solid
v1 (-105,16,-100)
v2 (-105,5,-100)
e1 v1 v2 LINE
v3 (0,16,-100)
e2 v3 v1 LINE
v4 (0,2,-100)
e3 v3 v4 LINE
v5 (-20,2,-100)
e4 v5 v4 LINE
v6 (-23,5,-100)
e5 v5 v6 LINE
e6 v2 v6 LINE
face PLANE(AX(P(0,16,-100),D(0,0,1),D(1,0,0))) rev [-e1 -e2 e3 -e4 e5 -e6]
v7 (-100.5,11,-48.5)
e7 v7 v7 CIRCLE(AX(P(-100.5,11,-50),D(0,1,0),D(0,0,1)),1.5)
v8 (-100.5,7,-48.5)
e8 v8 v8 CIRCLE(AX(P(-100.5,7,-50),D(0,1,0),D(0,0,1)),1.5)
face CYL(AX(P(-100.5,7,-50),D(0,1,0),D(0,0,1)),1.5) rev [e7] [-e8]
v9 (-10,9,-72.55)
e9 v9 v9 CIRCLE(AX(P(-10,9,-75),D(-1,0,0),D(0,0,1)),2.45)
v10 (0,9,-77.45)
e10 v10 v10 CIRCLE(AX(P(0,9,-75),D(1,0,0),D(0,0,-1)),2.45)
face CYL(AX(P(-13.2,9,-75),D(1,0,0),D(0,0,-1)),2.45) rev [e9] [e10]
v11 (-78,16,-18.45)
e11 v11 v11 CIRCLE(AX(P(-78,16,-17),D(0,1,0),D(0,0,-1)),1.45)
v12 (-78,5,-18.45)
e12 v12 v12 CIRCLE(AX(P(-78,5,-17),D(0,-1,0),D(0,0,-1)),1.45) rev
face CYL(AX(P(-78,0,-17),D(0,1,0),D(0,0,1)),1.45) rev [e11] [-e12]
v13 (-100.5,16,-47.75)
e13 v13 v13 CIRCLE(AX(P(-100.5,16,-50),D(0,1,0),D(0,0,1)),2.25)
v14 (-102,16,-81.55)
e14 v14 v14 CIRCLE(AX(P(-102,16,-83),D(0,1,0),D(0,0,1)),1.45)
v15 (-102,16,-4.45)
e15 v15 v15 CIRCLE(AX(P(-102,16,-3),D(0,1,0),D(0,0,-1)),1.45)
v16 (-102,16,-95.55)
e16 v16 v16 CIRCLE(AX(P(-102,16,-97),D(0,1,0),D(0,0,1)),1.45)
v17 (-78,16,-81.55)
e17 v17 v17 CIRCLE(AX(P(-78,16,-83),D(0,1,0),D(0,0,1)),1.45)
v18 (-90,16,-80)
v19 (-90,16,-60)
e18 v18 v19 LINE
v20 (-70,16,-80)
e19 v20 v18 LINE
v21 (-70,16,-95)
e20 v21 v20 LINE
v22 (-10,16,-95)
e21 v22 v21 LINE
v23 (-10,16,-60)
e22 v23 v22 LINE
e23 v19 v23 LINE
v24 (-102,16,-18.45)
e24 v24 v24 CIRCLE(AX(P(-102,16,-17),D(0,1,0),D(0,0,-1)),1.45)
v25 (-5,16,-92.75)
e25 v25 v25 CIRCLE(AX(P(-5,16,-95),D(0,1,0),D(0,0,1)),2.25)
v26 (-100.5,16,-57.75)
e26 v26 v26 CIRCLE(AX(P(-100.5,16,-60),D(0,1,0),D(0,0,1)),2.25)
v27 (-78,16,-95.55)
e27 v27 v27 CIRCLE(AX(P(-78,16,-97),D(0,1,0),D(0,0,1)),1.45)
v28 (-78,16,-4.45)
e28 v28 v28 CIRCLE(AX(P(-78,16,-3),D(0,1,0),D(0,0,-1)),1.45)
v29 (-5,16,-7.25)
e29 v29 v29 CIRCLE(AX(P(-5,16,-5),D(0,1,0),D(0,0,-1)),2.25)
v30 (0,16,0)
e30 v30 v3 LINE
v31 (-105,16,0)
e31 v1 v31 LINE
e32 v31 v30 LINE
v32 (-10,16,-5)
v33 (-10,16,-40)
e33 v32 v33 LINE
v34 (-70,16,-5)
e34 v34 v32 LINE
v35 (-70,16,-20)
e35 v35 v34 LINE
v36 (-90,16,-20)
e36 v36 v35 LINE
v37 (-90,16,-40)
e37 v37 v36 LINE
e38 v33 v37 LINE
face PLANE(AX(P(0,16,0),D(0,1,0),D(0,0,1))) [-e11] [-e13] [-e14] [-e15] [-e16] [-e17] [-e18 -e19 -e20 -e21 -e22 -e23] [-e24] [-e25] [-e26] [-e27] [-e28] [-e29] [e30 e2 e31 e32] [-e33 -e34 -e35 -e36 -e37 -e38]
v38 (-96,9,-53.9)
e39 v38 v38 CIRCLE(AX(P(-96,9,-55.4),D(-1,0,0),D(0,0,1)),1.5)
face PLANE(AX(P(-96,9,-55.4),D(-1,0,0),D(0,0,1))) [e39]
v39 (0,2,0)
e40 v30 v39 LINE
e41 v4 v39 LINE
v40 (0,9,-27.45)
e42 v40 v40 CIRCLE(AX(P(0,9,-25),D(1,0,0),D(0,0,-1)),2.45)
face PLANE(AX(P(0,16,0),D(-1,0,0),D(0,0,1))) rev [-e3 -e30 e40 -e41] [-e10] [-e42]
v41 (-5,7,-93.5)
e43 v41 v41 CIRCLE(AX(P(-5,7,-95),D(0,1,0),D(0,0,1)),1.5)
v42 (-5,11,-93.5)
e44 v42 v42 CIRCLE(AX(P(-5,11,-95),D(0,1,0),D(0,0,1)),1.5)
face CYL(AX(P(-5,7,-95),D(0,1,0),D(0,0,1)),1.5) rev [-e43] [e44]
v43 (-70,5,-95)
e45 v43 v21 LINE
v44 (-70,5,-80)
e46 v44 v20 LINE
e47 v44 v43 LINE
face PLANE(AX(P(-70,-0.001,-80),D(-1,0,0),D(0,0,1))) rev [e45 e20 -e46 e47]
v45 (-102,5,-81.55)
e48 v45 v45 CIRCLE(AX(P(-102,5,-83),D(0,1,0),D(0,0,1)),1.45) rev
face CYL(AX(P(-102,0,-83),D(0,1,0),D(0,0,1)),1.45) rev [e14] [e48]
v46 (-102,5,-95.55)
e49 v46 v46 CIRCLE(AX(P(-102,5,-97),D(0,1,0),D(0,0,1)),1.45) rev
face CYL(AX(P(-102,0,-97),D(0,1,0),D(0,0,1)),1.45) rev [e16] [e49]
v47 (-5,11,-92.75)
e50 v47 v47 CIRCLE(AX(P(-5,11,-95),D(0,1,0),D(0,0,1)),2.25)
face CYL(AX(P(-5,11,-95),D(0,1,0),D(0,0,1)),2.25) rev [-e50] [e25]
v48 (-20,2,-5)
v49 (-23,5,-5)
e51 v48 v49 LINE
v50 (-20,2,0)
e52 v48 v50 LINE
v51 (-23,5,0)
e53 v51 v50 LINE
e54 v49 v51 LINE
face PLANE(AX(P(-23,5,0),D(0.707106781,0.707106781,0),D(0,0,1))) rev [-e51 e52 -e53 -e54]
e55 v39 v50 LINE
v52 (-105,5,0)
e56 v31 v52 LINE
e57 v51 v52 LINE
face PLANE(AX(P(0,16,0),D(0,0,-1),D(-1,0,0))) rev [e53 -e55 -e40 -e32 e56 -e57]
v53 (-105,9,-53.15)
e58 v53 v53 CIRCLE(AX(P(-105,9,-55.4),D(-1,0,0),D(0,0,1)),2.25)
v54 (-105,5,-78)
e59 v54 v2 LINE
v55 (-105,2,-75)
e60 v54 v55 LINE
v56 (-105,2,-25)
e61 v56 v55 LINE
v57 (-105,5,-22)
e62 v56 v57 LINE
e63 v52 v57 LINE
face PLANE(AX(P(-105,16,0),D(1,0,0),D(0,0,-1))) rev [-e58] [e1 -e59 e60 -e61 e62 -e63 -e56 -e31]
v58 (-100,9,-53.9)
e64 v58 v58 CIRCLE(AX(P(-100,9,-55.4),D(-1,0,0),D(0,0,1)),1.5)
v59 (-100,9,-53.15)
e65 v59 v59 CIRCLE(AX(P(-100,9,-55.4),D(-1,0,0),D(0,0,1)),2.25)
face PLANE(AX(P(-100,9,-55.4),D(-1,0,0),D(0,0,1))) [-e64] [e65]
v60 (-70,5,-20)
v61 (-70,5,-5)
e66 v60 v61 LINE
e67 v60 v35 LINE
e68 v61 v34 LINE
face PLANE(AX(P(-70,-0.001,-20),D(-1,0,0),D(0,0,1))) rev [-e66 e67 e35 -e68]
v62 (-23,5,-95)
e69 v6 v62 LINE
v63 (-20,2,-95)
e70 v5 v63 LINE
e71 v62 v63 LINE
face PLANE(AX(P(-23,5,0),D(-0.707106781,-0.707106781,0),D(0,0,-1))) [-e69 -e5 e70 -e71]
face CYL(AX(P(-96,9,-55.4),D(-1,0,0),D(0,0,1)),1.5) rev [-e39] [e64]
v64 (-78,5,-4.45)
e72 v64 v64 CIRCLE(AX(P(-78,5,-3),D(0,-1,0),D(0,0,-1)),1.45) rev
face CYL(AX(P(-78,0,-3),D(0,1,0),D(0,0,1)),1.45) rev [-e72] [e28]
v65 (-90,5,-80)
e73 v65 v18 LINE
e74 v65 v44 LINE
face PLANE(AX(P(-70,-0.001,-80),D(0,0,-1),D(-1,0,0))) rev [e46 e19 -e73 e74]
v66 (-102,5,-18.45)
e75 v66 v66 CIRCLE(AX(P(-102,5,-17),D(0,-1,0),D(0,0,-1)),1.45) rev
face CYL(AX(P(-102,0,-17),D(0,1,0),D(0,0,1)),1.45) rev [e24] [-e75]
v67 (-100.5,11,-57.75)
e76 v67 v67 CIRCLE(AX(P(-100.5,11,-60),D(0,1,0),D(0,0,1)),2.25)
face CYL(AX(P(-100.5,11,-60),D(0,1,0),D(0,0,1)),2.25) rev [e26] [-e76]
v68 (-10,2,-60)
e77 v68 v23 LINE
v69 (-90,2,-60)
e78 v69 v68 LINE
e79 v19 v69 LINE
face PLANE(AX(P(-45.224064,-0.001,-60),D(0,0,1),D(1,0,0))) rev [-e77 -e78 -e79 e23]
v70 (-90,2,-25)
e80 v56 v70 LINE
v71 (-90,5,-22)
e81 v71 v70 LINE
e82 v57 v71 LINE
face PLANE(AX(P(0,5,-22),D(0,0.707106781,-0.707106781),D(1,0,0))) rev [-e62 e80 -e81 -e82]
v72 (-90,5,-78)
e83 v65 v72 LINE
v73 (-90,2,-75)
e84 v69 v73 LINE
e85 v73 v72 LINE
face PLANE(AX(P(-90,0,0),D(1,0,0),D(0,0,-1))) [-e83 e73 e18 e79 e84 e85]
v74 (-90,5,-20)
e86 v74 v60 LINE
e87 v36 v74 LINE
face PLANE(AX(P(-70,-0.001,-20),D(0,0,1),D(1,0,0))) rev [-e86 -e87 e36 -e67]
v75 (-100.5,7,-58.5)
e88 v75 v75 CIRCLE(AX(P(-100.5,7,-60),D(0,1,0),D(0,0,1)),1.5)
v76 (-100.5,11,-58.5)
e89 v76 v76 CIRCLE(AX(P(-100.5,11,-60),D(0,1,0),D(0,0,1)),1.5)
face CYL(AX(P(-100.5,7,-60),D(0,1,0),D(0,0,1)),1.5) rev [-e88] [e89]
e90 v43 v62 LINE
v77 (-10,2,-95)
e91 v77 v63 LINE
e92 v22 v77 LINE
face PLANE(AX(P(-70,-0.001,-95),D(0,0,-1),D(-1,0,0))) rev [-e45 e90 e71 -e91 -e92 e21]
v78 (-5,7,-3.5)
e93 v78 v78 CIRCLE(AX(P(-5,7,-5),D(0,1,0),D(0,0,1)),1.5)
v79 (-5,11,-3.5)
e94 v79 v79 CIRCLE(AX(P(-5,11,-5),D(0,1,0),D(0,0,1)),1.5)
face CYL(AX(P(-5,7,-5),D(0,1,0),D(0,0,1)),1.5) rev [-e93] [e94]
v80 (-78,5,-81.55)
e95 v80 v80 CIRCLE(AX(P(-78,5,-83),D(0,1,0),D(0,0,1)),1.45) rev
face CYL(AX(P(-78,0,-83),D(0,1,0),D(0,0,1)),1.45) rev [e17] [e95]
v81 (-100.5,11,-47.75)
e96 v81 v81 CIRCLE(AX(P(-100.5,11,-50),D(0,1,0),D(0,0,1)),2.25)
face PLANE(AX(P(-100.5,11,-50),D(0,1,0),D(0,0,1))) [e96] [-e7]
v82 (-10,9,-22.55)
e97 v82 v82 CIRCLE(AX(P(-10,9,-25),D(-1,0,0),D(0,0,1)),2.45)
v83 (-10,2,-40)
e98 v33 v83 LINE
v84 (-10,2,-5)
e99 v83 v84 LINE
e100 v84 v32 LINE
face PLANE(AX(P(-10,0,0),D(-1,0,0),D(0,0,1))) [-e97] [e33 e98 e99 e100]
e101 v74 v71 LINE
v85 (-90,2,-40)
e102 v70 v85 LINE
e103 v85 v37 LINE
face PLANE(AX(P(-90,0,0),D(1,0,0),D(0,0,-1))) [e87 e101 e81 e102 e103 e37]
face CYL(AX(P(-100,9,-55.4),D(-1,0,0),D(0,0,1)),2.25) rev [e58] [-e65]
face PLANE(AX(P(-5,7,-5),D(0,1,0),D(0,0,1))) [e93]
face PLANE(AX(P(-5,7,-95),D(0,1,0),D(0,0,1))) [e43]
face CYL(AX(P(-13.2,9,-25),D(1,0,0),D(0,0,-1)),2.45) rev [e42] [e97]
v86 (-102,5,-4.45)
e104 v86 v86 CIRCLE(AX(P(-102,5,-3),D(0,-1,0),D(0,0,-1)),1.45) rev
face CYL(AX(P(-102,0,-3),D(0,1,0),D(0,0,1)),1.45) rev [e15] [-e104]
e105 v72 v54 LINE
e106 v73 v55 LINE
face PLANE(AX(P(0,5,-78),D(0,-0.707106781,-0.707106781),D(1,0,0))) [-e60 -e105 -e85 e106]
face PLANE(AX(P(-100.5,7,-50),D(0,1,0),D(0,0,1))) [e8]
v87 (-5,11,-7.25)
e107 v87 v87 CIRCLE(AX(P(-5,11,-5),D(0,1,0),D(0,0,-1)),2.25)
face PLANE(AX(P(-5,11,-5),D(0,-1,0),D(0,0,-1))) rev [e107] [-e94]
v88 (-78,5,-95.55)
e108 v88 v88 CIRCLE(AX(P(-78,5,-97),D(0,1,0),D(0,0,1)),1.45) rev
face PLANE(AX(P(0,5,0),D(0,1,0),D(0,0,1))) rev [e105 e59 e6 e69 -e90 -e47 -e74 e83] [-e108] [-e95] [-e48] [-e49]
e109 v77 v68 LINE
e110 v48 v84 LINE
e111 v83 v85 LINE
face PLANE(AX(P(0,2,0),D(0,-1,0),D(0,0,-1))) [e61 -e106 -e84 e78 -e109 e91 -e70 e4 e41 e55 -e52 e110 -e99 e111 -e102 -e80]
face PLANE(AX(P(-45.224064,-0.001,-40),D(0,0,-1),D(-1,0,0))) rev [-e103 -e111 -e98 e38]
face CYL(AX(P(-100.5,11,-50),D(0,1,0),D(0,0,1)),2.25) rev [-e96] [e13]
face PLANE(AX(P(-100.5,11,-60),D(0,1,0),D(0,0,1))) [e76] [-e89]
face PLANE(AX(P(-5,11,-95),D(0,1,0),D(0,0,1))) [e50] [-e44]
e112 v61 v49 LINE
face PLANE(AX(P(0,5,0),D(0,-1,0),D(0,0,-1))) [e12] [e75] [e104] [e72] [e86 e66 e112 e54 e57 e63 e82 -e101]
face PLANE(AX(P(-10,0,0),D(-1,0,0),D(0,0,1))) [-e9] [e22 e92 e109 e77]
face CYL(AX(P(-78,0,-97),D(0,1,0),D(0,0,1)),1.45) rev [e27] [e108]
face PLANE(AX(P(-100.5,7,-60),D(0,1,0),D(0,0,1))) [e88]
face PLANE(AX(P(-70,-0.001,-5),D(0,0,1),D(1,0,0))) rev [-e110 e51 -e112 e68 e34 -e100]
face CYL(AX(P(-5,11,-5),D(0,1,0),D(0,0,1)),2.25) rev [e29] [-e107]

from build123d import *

# Parameters (mm, degrees)
SKETCH_1_W           = 105
SKETCH_1_H           = 100
EXTRUDE_1_DEPTH      = 16
CUT_EXTRUDE_5_REACH  = 147.88
SKETCH_8_R           = 1.45
CUT_EXTRUDE_7_DEPTH  = 146.880087743
SKETCH_9_W           = 35
SKETCH_9_H           = 16
EXTRUDE_2_DEPTH      = 5
SKETCH_10_R          = 2.25
CUT_EXTRUDE_8_DEPTH  = 5
SKETCH_12_W          = 20
SKETCH_12_H          = 16
EXTRUDE_3_DEPTH      = 10
SKETCH_13_R          = 2.25
CUT_EXTRUDE_10_DEPTH = 5
SKETCH_14_W          = 105
SKETCH_14_H          = 100
CUT_EXTRUDE_11_DEPTH = 2
SKETCH_15_R          = 1.5
CUT_EXTRUDE_12_DEPTH = 4
SKETCH_16_W          = 85
SKETCH_16_H          = 25
CUT_EXTRUDE_13_DEPTH = 3
CHAMFER_1_SIZE       = 3
SKETCH_17_R          = 2.25
CUT_EXTRUDE_14_DEPTH = 5
SKETCH_18_R          = 1.5
CUT_EXTRUDE_15_DEPTH = 4
SKETCH_21_R          = 2.45
CUT_EXTRUDE_17_DEPTH = 13.2


with BuildPart() as part:
    # 草图1 → 凸台-拉伸1 (new body)
    with BuildSketch(Plane(origin=(0, 0, 0), x_dir=(1, 0, 0), z_dir=(0, 1, 0))):
        with Locations((-52.5, 50)):
            Rectangle(SKETCH_1_W, SKETCH_1_H)
    extrude(amount=EXTRUDE_1_DEPTH)

    # 草图6 → 切除-拉伸5 (cut, up to next)
    with BuildSketch(Plane(origin=(0, 16, 0), x_dir=(1, 0, 0), z_dir=(0, 1, 0)), mode=Mode.PRIVATE) as cut_extrude_5_sk1:
        Polygon((-45.224064051, 40), (-5, 40), (-5, 5), (-70, 5), (-70, 20), (-100, 20), (-100, 40), align=None)
    cut_extrude_5_tool1 = extrude(cut_extrude_5_sk1.sketch, amount=-CUT_EXTRUDE_5_REACH, mode=Mode.PRIVATE) & part.part
    # 草图6 → 切除-拉伸5 (cut, up to next)
    with BuildSketch(Plane(origin=(0, 16, 0), x_dir=(1, 0, 0), z_dir=(0, 1, 0)), mode=Mode.PRIVATE) as cut_extrude_5_sk2:
        Polygon((-70, 95), (-5, 95), (-5, 60), (-45.224064051, 60), (-100, 60), (-100, 80), (-70, 80), align=None)
    cut_extrude_5_tool2 = extrude(cut_extrude_5_sk2.sketch, amount=-CUT_EXTRUDE_5_REACH, mode=Mode.PRIVATE) & part.part
    add(cut_extrude_5_tool1.solids().sort_by_distance((-47.413043, 16, -24.065217))[0], mode=Mode.SUBTRACT)
    add(cut_extrude_5_tool2.solids().sort_by_distance((-47.413043, 16, -75.934783))[0], mode=Mode.SUBTRACT)

    # 草图8 → 切除-拉伸7 (cut, through all)
    with BuildSketch(Plane(origin=(0, 16, 0), x_dir=(1, 0, 0), z_dir=(0, 1, 0))):
        with Locations(Location((-102, 97, 0), (0, 0, 270))):
            Circle(SKETCH_8_R)
        with Locations(Location((-102, 83, 0), (0, 0, 270))):
            Circle(SKETCH_8_R)
        with Locations(Location((-78, 97, 0), (0, 0, 270))):
            Circle(SKETCH_8_R)
        with Locations(Location((-78, 83, 0), (0, 0, 270))):
            Circle(SKETCH_8_R)
        with Locations(Location((-78, 17, 0), (0, 0, 90))):
            Circle(SKETCH_8_R)
        with Locations(Location((-78, 3, 0), (0, 0, 90))):
            Circle(SKETCH_8_R)
        with Locations(Location((-102, 17, 0), (0, 0, 90))):
            Circle(SKETCH_8_R)
        with Locations(Location((-102, 3, 0), (0, 0, 90))):
            Circle(SKETCH_8_R)
    extrude(amount=-CUT_EXTRUDE_7_DEPTH, mode=Mode.SUBTRACT)

    # 草图9 → 凸台-拉伸2 (add)
    with BuildSketch(Plane.ZY.offset(5)):
        with Locations((-22.5, 8)):
            Rectangle(SKETCH_9_W, SKETCH_9_H)
        with Locations((-77.5, 8)):
            Rectangle(SKETCH_9_W, SKETCH_9_H)
    extrude(amount=EXTRUDE_2_DEPTH)

    # 草图10 → 切除-拉伸8 (cut)
    with BuildSketch(Plane(origin=(0, 16, 0), x_dir=(1, 0, 0), z_dir=(0, 1, 0))):
        with Locations(Location((-5, 95, 0), (0, 0, 270))):
            Circle(SKETCH_10_R)
        with Locations(Location((-5, 5, 0), (0, 0, 90))):
            Circle(SKETCH_10_R)
    extrude(amount=-CUT_EXTRUDE_8_DEPTH, mode=Mode.SUBTRACT)

    # 草图12 → 凸台-拉伸3 (add)
    with BuildSketch(Plane(origin=(-100, 0, 0), x_dir=(0, 0, -1), z_dir=(1, 0, 0))):
        with Locations((30, 8)):
            Rectangle(SKETCH_12_W, SKETCH_12_H)
        with Locations((70, 8)):
            Rectangle(SKETCH_12_W, SKETCH_12_H)
    extrude(amount=EXTRUDE_3_DEPTH)

    # 草图13 → 切除-拉伸10 (cut)
    with BuildSketch(Plane(origin=(0, 16, 0), x_dir=(1, 0, 0), z_dir=(0, 1, 0))):
        with Locations(Location((-100.5, 50, 0), (0, 0, 270))):
            Circle(SKETCH_13_R)
        with Locations(Location((-100.5, 60, 0), (0, 0, 270))):
            Circle(SKETCH_13_R)
    extrude(amount=-CUT_EXTRUDE_10_DEPTH, mode=Mode.SUBTRACT)

    # 草图14 → 切除-拉伸11 (cut)
    with BuildSketch(Plane.XZ):
        with Locations((-52.5, -50)):
            Rectangle(SKETCH_14_W, SKETCH_14_H)
    extrude(amount=-CUT_EXTRUDE_11_DEPTH, mode=Mode.SUBTRACT)

    # 草图15 → 切除-拉伸12 (cut)
    with BuildSketch(Plane(origin=(0, 11, 0), x_dir=(1, 0, 0), z_dir=(0, 1, 0))):
        with Locations(Location((-5, 5, 0), (0, 0, 270))):
            Circle(SKETCH_15_R)
        with Locations(Location((-5, 95, 0), (0, 0, 270))):
            Circle(SKETCH_15_R)
        with Locations(Location((-100.5, 60, 0), (0, 0, 270))):
            Circle(SKETCH_15_R)
        with Locations(Location((-100.5, 50, 0), (0, 0, 270))):
            Circle(SKETCH_15_R)
    extrude(amount=-CUT_EXTRUDE_12_DEPTH, mode=Mode.SUBTRACT)

    # 草图16 → 切除-拉伸13 (cut)
    with BuildSketch(Plane.XZ.offset(-2)):
        with Locations((-62.5, -12.5)):
            Rectangle(SKETCH_16_W, SKETCH_16_H)
        with Locations((-62.5, -87.5)):
            Rectangle(SKETCH_16_W, SKETCH_16_H)
    extrude(amount=-CUT_EXTRUDE_13_DEPTH, mode=Mode.SUBTRACT)

    # 倒角1
    chamfer_1_edges = [part.edges().sort_by_distance(p)[0] for p in [
        (-20, 5, -2.5),
        (-97.5, 5, -25),
        (-97.5, 5, -75),
        (-20, 5, -97.5),
    ]]
    chamfer(chamfer_1_edges, length=CHAMFER_1_SIZE - 0.0001)  # a hair under: the kernel refuses the full size

    # 草图17 → 切除-拉伸14 (cut)
    with BuildSketch(Plane.ZY.offset(105)):
        with Locations((-55.4, 9)):
            Circle(SKETCH_17_R)
    extrude(amount=-CUT_EXTRUDE_14_DEPTH, mode=Mode.SUBTRACT)

    # 草图18 → 切除-拉伸15 (cut)
    with BuildSketch(Plane.ZY.offset(100)):
        with Locations((-55.4, 9)):
            Circle(SKETCH_18_R)
    extrude(amount=-CUT_EXTRUDE_15_DEPTH, mode=Mode.SUBTRACT)

    # 草图21 → 切除-拉伸17 (cut)
    with BuildSketch(Plane(origin=(0, 0, 0), x_dir=(0, 0, -1), z_dir=(1, 0, 0))):
        with Locations((25, 9)):
            Circle(SKETCH_21_R)
        with Locations((75, 9)):
            Circle(SKETCH_21_R)
    extrude(amount=-CUT_EXTRUDE_17_DEPTH, mode=Mode.SUBTRACT)


solid = part.part
